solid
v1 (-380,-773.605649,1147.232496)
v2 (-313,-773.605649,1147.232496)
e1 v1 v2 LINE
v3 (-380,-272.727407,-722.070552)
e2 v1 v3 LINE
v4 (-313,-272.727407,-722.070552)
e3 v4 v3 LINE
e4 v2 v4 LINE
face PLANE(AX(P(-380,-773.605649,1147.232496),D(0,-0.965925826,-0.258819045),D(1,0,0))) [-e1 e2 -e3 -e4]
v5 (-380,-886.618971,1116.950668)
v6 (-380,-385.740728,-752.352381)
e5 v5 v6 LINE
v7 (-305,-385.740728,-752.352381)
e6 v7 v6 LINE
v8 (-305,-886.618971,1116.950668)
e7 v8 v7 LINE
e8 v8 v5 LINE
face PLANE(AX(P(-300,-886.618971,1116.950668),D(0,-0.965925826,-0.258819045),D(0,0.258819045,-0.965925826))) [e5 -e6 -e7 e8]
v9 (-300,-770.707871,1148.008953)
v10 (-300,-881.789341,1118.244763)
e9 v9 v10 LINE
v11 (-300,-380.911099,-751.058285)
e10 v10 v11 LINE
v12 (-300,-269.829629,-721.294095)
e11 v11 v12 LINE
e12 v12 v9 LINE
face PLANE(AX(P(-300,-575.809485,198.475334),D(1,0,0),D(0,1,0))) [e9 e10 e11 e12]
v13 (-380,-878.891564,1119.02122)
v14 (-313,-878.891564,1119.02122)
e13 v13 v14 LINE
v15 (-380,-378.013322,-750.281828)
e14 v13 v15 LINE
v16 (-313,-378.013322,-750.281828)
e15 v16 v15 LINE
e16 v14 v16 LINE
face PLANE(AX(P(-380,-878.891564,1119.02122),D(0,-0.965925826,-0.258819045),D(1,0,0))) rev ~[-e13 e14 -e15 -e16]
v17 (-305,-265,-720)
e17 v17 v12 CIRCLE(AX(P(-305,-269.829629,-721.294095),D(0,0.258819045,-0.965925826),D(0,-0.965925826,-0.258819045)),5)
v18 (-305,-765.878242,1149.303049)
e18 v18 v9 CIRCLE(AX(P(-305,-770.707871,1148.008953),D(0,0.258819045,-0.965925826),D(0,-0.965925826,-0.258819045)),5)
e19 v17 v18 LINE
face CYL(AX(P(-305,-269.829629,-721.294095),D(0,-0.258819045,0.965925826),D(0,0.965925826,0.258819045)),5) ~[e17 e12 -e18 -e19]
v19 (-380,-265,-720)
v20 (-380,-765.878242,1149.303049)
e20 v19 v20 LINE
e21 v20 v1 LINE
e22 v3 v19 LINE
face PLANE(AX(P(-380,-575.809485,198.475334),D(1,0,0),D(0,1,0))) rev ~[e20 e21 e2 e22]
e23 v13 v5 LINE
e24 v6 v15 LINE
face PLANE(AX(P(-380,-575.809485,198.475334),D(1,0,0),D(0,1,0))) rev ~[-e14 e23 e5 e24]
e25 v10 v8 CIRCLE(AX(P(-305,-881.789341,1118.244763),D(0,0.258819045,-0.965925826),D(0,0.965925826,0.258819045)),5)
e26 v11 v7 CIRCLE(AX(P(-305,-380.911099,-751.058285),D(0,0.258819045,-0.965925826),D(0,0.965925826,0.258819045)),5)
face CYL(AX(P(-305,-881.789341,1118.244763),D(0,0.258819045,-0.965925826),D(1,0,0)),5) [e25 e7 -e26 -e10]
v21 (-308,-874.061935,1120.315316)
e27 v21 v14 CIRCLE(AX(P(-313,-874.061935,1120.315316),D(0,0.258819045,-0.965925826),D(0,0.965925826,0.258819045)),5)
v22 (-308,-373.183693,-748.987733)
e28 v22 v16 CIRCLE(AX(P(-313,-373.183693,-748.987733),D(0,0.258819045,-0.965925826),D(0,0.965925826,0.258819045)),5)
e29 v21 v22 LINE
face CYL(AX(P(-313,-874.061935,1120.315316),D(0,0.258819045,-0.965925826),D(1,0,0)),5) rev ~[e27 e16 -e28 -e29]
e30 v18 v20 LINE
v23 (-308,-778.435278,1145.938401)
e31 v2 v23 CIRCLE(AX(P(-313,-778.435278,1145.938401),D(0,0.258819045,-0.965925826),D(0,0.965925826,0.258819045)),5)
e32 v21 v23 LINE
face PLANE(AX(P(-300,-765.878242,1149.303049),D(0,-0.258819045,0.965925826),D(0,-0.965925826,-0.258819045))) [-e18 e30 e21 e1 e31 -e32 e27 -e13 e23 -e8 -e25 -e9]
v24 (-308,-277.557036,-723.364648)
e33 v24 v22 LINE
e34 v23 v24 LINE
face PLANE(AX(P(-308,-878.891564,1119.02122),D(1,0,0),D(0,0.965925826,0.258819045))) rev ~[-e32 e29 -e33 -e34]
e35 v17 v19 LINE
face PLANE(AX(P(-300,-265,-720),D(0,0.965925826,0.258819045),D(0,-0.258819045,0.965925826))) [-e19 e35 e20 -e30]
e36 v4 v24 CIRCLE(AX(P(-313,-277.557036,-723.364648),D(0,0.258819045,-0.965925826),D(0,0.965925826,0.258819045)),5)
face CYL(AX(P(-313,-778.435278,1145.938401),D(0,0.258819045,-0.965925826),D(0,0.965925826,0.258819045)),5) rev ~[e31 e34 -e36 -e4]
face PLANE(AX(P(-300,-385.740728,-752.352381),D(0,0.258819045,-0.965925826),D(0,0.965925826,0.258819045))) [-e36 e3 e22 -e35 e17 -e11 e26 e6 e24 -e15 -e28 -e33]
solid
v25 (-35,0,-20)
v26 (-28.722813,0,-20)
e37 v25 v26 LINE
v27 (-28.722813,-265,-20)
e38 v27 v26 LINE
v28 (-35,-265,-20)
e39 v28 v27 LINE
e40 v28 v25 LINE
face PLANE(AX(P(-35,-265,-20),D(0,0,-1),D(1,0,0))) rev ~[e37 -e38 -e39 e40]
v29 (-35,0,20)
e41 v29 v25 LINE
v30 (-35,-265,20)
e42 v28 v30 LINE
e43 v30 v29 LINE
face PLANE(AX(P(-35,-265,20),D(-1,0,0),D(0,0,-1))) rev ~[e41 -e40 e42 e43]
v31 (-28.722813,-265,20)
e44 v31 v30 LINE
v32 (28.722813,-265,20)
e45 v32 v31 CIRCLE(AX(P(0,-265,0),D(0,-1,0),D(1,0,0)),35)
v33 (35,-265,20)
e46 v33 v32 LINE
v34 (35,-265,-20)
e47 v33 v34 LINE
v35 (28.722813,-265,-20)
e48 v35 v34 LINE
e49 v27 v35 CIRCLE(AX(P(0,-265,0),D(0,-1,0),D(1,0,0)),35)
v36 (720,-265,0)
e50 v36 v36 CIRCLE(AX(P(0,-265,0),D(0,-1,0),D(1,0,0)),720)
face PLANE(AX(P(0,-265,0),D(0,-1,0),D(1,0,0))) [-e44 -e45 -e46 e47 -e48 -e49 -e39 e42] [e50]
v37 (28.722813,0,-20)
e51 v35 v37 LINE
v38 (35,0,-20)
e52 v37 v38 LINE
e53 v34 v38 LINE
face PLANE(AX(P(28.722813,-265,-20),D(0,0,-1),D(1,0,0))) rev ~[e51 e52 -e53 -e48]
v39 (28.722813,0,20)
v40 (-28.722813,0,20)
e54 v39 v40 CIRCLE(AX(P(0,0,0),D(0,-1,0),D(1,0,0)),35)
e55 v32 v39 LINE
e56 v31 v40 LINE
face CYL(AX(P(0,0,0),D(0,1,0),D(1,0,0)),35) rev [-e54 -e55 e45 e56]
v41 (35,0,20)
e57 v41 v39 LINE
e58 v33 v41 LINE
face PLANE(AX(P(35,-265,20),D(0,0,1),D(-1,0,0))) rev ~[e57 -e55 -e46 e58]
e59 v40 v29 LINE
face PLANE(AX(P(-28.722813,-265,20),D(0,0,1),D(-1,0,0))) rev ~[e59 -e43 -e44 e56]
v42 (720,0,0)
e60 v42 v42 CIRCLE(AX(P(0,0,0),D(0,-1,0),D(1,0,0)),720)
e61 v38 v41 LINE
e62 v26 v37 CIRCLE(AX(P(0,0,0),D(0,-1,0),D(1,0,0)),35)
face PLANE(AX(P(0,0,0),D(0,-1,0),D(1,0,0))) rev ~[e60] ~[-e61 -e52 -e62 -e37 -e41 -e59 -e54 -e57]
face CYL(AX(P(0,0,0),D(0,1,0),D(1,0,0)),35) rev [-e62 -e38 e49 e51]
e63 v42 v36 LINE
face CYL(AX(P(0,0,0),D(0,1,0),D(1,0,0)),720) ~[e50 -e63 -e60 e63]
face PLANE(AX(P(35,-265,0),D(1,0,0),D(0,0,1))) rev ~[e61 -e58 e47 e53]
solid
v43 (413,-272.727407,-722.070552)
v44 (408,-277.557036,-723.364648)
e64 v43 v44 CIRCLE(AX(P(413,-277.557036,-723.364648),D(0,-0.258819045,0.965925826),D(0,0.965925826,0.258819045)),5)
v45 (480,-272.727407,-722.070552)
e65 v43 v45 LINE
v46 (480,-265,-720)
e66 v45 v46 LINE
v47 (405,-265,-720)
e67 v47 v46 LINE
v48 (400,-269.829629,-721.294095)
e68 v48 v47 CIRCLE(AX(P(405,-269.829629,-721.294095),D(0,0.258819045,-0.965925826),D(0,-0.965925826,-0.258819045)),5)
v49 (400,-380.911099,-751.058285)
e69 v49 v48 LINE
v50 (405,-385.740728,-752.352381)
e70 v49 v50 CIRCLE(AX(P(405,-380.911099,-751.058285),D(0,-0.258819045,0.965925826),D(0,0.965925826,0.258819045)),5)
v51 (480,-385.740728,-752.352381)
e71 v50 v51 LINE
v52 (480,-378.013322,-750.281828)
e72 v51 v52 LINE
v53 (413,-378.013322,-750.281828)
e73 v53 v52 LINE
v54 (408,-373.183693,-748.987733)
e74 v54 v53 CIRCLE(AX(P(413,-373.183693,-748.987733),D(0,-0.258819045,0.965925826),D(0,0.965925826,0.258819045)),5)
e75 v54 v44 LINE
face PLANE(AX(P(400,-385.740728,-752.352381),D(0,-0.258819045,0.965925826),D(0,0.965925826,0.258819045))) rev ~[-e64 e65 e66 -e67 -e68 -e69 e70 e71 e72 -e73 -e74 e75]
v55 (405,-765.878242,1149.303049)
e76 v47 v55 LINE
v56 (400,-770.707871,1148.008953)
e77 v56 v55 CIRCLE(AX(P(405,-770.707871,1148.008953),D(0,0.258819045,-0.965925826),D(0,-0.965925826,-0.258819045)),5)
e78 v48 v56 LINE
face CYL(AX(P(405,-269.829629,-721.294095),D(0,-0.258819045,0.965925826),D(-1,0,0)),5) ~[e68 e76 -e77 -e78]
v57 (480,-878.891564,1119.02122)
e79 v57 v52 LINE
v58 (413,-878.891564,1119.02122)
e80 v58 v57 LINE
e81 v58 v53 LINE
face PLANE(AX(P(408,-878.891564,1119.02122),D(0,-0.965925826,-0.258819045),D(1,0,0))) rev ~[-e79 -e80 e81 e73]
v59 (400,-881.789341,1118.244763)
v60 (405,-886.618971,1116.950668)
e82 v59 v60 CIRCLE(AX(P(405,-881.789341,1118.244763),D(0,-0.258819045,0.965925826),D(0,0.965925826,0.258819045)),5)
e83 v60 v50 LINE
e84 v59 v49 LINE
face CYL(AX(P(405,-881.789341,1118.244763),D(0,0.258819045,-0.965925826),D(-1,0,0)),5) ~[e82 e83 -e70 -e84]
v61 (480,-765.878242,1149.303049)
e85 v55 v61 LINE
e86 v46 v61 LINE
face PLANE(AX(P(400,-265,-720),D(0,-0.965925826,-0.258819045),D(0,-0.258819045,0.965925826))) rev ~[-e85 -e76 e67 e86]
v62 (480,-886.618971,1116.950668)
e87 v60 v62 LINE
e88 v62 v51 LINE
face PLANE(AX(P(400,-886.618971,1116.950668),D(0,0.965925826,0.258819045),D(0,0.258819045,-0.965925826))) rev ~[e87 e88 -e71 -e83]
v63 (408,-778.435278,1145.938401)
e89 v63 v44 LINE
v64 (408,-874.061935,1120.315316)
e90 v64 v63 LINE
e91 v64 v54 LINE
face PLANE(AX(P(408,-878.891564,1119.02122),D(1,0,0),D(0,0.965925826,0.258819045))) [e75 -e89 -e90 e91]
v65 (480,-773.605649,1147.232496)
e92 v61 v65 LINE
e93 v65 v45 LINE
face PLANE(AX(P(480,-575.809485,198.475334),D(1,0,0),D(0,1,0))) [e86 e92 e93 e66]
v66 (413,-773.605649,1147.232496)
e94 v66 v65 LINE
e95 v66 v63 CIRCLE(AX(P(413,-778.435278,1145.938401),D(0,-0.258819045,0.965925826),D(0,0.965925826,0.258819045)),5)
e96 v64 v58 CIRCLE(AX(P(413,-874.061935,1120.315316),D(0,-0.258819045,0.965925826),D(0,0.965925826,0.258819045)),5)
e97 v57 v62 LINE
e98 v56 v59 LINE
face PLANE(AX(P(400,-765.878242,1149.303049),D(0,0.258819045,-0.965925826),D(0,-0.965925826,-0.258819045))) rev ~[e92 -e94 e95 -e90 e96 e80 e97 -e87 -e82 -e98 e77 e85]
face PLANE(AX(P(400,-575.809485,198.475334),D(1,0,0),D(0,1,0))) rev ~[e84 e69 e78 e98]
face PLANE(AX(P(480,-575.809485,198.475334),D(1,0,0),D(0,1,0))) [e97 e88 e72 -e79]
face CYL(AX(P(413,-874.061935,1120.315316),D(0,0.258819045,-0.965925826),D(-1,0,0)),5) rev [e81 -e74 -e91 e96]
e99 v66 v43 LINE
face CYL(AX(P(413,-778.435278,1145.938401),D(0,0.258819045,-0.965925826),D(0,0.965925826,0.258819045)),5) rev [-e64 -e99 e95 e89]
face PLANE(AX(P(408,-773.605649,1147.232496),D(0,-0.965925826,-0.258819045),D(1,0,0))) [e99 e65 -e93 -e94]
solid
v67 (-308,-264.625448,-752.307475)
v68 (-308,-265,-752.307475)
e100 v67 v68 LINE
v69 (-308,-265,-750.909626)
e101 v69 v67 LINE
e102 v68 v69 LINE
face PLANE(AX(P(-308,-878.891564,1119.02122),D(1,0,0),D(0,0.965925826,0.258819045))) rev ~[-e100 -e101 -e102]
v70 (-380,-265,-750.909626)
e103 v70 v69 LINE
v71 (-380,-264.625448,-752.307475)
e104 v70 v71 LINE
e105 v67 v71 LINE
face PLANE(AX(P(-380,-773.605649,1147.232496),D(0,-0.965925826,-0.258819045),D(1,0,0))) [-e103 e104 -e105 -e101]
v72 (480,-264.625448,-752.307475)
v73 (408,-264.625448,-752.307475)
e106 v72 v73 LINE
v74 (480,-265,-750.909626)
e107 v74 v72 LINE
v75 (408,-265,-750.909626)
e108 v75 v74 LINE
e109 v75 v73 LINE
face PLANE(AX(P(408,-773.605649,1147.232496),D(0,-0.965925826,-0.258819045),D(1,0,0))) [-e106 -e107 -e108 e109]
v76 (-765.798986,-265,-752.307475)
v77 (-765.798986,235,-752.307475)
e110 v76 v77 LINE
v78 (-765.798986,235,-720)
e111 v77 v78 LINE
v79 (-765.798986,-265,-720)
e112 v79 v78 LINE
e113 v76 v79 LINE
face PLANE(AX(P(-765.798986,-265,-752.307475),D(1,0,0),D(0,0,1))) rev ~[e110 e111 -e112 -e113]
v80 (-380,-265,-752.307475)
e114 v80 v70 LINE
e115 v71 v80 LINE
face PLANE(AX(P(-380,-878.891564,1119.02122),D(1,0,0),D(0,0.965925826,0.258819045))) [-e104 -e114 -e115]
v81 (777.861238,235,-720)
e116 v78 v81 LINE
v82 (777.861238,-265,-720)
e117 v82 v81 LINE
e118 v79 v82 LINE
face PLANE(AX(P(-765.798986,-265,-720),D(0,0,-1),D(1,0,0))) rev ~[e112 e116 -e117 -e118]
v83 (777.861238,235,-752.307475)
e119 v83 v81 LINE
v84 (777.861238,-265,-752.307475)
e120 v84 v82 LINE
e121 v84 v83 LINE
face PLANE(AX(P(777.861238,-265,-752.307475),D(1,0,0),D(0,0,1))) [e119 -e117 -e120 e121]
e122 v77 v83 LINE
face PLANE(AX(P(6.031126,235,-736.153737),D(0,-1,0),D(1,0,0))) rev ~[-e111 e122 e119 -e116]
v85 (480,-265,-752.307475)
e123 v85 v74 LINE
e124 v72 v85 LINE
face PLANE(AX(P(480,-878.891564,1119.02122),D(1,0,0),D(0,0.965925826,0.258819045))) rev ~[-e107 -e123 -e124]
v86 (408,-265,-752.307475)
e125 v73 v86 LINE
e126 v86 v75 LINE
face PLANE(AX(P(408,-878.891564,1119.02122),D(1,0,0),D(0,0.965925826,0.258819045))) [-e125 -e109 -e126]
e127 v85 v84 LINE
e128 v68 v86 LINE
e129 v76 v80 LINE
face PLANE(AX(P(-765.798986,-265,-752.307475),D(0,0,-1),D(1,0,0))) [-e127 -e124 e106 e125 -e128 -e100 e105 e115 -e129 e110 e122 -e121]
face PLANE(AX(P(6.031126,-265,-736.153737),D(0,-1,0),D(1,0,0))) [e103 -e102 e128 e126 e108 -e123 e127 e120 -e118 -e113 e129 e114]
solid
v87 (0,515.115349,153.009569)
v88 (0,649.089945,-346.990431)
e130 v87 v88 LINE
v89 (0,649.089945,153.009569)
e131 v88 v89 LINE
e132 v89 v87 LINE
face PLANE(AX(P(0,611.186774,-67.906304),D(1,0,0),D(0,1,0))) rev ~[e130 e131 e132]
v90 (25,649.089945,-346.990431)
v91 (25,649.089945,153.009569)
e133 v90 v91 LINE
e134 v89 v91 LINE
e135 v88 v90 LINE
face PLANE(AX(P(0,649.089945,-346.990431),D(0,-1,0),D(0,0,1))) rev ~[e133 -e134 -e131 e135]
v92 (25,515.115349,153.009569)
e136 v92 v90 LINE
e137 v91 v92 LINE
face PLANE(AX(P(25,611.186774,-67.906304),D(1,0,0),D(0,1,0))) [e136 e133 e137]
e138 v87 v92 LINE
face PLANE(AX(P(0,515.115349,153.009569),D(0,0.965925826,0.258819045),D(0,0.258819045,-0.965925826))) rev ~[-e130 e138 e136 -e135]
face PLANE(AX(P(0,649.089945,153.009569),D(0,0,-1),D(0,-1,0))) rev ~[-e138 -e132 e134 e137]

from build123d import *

# Parameters (mm, degrees)
F0_R      = 720
F0_R_2    = 35
F1_DEPTH  = 265
F3_DEPTH  = 265.001
F4_W      = 1543.660223484
F4_H      = 32.3074746132
F5_DEPTH  = 500
F7_START  = -300
F7_DEPTH  = 80
F8_START  = 400
F8_DEPTH  = 80
F9_W      = 72
F9_H      = 109
F10_DEPTH = 2095.9054427361
F11_R     = 5
F11_2_R   = 5
F12_R     = 5
F13_R     = 5
F14_R     = 5
F15_R     = 5
F17_DEPTH = 25


# Not quite as in the source:
# - a feature names something its author has since deleted; it is built from what else it names


with BuildPart() as f1:
    # F0 (on Front) → F1 (new body)
    with BuildSketch(Plane.XZ):
        Circle(F0_R)
        Circle(F0_R_2, mode=Mode.SUBTRACT)
    extrude(amount=F1_DEPTH)

    # F2 (on face) → F3 (cut, through all)
    with BuildSketch(Plane.XZ.offset(265)):
        with BuildLine():
            ThreePointArc((28.7228132327, 20), (33.3938502059, 10.4809717311), (35, 0))
            Line((35, 0), (35, 20))
            Line((35, 20), (28.7228132327, 20))
        make_face()
        with BuildLine():
            Line((35, -20), (35, 0))
            ThreePointArc((35, 0), (33.3938502059, -10.4809717311), (28.7228132327, -20))
            Line((28.7228132327, -20), (35, -20))
        make_face()
        with BuildLine():
            ThreePointArc((-28.7228132327, -20), (-33.3938502035, -10.4809717386), (-35, -1.57e-08))
            Line((-35, -1.57e-08), (-35, -20))
            Line((-35, -20), (-28.7228132327, -20))
        make_face()
        with BuildLine():
            Line((-35, 20), (-35, -1.57e-08))
            ThreePointArc((-35, -1.57e-08), (-33.3938502082, 10.4809717236), (-28.7228132327, 20))
            Line((-28.7228132327, 20), (-35, 20))
        make_face()
    extrude(amount=-F3_DEPTH, mode=Mode.SUBTRACT)


with BuildPart() as f5:
    # F4 (on face) → F5 (new body)
    with BuildSketch(Plane.XZ.offset(265)):
        with Locations((6.0311257839, -736.1537373066)):
            Rectangle(F4_W, F4_H)
    extrude(amount=-F5_DEPTH)


with BuildPart() as f7:
    # F6 (on Right) → F7 (new body)
    with BuildSketch(Plane.YZ.offset(F7_START)):
        Polygon((-385.7407282861, -752.3523806378), (-265, -720), (-765.8782422817, 1149.3030486012), (-886.6189705679, 1116.9506679634), align=None)
    extrude(amount=-F7_DEPTH)


with BuildPart() as f8:
    # F6 (on Right) → F8 (new body)
    with BuildSketch(Plane.YZ.offset(F8_START)):
        Polygon((-385.7407282861, -752.3523806378), (-265, -720), (-765.8782422817, 1149.3030486012), (-886.6189705679, 1116.9506679634), align=None)
    extrude(amount=F8_DEPTH)


with BuildPart() as f10_tool:
    # F9 (on face) → F10 (new body, through all)
    with BuildSketch(Plane(origin=(0, -338.6298762803, 1263.7839032388), x_dir=(1, 0, 0), z_dir=(0, -0.2588190451, 0.9659258263))):
        with Locations((444, -504.8200564404)):
            Rectangle(F9_W, F9_H)
        with Locations((-344, -504.8200564404)):
            Rectangle(F9_W, F9_H)
    extrude(amount=-F10_DEPTH)


with BuildPart() as f5_1:
    add(f5.part)

    # F10: cut by f10_tool
    add(f10_tool.part, mode=Mode.SUBTRACT)


with BuildPart() as f7_1:
    add(f7.part)

    # F10: cut by f10_tool
    add(f10_tool.part, mode=Mode.SUBTRACT)

    # F11
    f11_edges = [f7_1.edges().sort_by_distance(p)[0] for p in [
        (-308, -523.166528, 212.580972),
    ]]
    fillet(f11_edges, radius=F11_R)

    # F12
    f12_edges = [f7_1.edges().sort_by_distance(p)[0] for p in [
        (-300, -636.179849, 182.299144),
        (-300, -515.439121, 214.651524),
    ]]
    fillet(f12_edges, radius=F12_R)

    # F13
    f13_edges = [f7_1.edges().sort_by_distance(p)[0] for p in [
        (-308, -628.452443, 184.369696),
    ]]
    fillet(f13_edges, radius=F13_R)


with BuildPart() as f8_1:
    add(f8.part)

    # F10: cut by f10_tool
    add(f10_tool.part, mode=Mode.SUBTRACT)

    # F11#2
    f11_2_edges = [f8_1.edges().sort_by_distance(p)[0] for p in [
        (400, -515.439121, 214.651524),
        (400, -636.179849, 182.299144),
    ]]
    fillet(f11_2_edges, radius=F11_2_R)

    # F14
    f14_edges = [f8_1.edges().sort_by_distance(p)[0] for p in [
        (408, -523.166528, 212.580972),
    ]]
    fillet(f14_edges, radius=F14_R)

    # F15
    f15_edges = [f8_1.edges().sort_by_distance(p)[0] for p in [
        (408, -628.452443, 184.369696),
    ]]
    fillet(f15_edges, radius=F15_R)


with BuildPart() as f17:
    # F16 (on Right) → F17 (new body)
    with BuildSketch(Plane.YZ):
        Polygon((515.1153491874, 153.0095694043), (649.089945403, -346.9904305957), (649.089945403, 153.0095694043), align=None)
    extrude(amount=F17_DEPTH)


solid = Compound([f1.part, f5_1.part, f7_1.part, f8_1.part, f17.part])
